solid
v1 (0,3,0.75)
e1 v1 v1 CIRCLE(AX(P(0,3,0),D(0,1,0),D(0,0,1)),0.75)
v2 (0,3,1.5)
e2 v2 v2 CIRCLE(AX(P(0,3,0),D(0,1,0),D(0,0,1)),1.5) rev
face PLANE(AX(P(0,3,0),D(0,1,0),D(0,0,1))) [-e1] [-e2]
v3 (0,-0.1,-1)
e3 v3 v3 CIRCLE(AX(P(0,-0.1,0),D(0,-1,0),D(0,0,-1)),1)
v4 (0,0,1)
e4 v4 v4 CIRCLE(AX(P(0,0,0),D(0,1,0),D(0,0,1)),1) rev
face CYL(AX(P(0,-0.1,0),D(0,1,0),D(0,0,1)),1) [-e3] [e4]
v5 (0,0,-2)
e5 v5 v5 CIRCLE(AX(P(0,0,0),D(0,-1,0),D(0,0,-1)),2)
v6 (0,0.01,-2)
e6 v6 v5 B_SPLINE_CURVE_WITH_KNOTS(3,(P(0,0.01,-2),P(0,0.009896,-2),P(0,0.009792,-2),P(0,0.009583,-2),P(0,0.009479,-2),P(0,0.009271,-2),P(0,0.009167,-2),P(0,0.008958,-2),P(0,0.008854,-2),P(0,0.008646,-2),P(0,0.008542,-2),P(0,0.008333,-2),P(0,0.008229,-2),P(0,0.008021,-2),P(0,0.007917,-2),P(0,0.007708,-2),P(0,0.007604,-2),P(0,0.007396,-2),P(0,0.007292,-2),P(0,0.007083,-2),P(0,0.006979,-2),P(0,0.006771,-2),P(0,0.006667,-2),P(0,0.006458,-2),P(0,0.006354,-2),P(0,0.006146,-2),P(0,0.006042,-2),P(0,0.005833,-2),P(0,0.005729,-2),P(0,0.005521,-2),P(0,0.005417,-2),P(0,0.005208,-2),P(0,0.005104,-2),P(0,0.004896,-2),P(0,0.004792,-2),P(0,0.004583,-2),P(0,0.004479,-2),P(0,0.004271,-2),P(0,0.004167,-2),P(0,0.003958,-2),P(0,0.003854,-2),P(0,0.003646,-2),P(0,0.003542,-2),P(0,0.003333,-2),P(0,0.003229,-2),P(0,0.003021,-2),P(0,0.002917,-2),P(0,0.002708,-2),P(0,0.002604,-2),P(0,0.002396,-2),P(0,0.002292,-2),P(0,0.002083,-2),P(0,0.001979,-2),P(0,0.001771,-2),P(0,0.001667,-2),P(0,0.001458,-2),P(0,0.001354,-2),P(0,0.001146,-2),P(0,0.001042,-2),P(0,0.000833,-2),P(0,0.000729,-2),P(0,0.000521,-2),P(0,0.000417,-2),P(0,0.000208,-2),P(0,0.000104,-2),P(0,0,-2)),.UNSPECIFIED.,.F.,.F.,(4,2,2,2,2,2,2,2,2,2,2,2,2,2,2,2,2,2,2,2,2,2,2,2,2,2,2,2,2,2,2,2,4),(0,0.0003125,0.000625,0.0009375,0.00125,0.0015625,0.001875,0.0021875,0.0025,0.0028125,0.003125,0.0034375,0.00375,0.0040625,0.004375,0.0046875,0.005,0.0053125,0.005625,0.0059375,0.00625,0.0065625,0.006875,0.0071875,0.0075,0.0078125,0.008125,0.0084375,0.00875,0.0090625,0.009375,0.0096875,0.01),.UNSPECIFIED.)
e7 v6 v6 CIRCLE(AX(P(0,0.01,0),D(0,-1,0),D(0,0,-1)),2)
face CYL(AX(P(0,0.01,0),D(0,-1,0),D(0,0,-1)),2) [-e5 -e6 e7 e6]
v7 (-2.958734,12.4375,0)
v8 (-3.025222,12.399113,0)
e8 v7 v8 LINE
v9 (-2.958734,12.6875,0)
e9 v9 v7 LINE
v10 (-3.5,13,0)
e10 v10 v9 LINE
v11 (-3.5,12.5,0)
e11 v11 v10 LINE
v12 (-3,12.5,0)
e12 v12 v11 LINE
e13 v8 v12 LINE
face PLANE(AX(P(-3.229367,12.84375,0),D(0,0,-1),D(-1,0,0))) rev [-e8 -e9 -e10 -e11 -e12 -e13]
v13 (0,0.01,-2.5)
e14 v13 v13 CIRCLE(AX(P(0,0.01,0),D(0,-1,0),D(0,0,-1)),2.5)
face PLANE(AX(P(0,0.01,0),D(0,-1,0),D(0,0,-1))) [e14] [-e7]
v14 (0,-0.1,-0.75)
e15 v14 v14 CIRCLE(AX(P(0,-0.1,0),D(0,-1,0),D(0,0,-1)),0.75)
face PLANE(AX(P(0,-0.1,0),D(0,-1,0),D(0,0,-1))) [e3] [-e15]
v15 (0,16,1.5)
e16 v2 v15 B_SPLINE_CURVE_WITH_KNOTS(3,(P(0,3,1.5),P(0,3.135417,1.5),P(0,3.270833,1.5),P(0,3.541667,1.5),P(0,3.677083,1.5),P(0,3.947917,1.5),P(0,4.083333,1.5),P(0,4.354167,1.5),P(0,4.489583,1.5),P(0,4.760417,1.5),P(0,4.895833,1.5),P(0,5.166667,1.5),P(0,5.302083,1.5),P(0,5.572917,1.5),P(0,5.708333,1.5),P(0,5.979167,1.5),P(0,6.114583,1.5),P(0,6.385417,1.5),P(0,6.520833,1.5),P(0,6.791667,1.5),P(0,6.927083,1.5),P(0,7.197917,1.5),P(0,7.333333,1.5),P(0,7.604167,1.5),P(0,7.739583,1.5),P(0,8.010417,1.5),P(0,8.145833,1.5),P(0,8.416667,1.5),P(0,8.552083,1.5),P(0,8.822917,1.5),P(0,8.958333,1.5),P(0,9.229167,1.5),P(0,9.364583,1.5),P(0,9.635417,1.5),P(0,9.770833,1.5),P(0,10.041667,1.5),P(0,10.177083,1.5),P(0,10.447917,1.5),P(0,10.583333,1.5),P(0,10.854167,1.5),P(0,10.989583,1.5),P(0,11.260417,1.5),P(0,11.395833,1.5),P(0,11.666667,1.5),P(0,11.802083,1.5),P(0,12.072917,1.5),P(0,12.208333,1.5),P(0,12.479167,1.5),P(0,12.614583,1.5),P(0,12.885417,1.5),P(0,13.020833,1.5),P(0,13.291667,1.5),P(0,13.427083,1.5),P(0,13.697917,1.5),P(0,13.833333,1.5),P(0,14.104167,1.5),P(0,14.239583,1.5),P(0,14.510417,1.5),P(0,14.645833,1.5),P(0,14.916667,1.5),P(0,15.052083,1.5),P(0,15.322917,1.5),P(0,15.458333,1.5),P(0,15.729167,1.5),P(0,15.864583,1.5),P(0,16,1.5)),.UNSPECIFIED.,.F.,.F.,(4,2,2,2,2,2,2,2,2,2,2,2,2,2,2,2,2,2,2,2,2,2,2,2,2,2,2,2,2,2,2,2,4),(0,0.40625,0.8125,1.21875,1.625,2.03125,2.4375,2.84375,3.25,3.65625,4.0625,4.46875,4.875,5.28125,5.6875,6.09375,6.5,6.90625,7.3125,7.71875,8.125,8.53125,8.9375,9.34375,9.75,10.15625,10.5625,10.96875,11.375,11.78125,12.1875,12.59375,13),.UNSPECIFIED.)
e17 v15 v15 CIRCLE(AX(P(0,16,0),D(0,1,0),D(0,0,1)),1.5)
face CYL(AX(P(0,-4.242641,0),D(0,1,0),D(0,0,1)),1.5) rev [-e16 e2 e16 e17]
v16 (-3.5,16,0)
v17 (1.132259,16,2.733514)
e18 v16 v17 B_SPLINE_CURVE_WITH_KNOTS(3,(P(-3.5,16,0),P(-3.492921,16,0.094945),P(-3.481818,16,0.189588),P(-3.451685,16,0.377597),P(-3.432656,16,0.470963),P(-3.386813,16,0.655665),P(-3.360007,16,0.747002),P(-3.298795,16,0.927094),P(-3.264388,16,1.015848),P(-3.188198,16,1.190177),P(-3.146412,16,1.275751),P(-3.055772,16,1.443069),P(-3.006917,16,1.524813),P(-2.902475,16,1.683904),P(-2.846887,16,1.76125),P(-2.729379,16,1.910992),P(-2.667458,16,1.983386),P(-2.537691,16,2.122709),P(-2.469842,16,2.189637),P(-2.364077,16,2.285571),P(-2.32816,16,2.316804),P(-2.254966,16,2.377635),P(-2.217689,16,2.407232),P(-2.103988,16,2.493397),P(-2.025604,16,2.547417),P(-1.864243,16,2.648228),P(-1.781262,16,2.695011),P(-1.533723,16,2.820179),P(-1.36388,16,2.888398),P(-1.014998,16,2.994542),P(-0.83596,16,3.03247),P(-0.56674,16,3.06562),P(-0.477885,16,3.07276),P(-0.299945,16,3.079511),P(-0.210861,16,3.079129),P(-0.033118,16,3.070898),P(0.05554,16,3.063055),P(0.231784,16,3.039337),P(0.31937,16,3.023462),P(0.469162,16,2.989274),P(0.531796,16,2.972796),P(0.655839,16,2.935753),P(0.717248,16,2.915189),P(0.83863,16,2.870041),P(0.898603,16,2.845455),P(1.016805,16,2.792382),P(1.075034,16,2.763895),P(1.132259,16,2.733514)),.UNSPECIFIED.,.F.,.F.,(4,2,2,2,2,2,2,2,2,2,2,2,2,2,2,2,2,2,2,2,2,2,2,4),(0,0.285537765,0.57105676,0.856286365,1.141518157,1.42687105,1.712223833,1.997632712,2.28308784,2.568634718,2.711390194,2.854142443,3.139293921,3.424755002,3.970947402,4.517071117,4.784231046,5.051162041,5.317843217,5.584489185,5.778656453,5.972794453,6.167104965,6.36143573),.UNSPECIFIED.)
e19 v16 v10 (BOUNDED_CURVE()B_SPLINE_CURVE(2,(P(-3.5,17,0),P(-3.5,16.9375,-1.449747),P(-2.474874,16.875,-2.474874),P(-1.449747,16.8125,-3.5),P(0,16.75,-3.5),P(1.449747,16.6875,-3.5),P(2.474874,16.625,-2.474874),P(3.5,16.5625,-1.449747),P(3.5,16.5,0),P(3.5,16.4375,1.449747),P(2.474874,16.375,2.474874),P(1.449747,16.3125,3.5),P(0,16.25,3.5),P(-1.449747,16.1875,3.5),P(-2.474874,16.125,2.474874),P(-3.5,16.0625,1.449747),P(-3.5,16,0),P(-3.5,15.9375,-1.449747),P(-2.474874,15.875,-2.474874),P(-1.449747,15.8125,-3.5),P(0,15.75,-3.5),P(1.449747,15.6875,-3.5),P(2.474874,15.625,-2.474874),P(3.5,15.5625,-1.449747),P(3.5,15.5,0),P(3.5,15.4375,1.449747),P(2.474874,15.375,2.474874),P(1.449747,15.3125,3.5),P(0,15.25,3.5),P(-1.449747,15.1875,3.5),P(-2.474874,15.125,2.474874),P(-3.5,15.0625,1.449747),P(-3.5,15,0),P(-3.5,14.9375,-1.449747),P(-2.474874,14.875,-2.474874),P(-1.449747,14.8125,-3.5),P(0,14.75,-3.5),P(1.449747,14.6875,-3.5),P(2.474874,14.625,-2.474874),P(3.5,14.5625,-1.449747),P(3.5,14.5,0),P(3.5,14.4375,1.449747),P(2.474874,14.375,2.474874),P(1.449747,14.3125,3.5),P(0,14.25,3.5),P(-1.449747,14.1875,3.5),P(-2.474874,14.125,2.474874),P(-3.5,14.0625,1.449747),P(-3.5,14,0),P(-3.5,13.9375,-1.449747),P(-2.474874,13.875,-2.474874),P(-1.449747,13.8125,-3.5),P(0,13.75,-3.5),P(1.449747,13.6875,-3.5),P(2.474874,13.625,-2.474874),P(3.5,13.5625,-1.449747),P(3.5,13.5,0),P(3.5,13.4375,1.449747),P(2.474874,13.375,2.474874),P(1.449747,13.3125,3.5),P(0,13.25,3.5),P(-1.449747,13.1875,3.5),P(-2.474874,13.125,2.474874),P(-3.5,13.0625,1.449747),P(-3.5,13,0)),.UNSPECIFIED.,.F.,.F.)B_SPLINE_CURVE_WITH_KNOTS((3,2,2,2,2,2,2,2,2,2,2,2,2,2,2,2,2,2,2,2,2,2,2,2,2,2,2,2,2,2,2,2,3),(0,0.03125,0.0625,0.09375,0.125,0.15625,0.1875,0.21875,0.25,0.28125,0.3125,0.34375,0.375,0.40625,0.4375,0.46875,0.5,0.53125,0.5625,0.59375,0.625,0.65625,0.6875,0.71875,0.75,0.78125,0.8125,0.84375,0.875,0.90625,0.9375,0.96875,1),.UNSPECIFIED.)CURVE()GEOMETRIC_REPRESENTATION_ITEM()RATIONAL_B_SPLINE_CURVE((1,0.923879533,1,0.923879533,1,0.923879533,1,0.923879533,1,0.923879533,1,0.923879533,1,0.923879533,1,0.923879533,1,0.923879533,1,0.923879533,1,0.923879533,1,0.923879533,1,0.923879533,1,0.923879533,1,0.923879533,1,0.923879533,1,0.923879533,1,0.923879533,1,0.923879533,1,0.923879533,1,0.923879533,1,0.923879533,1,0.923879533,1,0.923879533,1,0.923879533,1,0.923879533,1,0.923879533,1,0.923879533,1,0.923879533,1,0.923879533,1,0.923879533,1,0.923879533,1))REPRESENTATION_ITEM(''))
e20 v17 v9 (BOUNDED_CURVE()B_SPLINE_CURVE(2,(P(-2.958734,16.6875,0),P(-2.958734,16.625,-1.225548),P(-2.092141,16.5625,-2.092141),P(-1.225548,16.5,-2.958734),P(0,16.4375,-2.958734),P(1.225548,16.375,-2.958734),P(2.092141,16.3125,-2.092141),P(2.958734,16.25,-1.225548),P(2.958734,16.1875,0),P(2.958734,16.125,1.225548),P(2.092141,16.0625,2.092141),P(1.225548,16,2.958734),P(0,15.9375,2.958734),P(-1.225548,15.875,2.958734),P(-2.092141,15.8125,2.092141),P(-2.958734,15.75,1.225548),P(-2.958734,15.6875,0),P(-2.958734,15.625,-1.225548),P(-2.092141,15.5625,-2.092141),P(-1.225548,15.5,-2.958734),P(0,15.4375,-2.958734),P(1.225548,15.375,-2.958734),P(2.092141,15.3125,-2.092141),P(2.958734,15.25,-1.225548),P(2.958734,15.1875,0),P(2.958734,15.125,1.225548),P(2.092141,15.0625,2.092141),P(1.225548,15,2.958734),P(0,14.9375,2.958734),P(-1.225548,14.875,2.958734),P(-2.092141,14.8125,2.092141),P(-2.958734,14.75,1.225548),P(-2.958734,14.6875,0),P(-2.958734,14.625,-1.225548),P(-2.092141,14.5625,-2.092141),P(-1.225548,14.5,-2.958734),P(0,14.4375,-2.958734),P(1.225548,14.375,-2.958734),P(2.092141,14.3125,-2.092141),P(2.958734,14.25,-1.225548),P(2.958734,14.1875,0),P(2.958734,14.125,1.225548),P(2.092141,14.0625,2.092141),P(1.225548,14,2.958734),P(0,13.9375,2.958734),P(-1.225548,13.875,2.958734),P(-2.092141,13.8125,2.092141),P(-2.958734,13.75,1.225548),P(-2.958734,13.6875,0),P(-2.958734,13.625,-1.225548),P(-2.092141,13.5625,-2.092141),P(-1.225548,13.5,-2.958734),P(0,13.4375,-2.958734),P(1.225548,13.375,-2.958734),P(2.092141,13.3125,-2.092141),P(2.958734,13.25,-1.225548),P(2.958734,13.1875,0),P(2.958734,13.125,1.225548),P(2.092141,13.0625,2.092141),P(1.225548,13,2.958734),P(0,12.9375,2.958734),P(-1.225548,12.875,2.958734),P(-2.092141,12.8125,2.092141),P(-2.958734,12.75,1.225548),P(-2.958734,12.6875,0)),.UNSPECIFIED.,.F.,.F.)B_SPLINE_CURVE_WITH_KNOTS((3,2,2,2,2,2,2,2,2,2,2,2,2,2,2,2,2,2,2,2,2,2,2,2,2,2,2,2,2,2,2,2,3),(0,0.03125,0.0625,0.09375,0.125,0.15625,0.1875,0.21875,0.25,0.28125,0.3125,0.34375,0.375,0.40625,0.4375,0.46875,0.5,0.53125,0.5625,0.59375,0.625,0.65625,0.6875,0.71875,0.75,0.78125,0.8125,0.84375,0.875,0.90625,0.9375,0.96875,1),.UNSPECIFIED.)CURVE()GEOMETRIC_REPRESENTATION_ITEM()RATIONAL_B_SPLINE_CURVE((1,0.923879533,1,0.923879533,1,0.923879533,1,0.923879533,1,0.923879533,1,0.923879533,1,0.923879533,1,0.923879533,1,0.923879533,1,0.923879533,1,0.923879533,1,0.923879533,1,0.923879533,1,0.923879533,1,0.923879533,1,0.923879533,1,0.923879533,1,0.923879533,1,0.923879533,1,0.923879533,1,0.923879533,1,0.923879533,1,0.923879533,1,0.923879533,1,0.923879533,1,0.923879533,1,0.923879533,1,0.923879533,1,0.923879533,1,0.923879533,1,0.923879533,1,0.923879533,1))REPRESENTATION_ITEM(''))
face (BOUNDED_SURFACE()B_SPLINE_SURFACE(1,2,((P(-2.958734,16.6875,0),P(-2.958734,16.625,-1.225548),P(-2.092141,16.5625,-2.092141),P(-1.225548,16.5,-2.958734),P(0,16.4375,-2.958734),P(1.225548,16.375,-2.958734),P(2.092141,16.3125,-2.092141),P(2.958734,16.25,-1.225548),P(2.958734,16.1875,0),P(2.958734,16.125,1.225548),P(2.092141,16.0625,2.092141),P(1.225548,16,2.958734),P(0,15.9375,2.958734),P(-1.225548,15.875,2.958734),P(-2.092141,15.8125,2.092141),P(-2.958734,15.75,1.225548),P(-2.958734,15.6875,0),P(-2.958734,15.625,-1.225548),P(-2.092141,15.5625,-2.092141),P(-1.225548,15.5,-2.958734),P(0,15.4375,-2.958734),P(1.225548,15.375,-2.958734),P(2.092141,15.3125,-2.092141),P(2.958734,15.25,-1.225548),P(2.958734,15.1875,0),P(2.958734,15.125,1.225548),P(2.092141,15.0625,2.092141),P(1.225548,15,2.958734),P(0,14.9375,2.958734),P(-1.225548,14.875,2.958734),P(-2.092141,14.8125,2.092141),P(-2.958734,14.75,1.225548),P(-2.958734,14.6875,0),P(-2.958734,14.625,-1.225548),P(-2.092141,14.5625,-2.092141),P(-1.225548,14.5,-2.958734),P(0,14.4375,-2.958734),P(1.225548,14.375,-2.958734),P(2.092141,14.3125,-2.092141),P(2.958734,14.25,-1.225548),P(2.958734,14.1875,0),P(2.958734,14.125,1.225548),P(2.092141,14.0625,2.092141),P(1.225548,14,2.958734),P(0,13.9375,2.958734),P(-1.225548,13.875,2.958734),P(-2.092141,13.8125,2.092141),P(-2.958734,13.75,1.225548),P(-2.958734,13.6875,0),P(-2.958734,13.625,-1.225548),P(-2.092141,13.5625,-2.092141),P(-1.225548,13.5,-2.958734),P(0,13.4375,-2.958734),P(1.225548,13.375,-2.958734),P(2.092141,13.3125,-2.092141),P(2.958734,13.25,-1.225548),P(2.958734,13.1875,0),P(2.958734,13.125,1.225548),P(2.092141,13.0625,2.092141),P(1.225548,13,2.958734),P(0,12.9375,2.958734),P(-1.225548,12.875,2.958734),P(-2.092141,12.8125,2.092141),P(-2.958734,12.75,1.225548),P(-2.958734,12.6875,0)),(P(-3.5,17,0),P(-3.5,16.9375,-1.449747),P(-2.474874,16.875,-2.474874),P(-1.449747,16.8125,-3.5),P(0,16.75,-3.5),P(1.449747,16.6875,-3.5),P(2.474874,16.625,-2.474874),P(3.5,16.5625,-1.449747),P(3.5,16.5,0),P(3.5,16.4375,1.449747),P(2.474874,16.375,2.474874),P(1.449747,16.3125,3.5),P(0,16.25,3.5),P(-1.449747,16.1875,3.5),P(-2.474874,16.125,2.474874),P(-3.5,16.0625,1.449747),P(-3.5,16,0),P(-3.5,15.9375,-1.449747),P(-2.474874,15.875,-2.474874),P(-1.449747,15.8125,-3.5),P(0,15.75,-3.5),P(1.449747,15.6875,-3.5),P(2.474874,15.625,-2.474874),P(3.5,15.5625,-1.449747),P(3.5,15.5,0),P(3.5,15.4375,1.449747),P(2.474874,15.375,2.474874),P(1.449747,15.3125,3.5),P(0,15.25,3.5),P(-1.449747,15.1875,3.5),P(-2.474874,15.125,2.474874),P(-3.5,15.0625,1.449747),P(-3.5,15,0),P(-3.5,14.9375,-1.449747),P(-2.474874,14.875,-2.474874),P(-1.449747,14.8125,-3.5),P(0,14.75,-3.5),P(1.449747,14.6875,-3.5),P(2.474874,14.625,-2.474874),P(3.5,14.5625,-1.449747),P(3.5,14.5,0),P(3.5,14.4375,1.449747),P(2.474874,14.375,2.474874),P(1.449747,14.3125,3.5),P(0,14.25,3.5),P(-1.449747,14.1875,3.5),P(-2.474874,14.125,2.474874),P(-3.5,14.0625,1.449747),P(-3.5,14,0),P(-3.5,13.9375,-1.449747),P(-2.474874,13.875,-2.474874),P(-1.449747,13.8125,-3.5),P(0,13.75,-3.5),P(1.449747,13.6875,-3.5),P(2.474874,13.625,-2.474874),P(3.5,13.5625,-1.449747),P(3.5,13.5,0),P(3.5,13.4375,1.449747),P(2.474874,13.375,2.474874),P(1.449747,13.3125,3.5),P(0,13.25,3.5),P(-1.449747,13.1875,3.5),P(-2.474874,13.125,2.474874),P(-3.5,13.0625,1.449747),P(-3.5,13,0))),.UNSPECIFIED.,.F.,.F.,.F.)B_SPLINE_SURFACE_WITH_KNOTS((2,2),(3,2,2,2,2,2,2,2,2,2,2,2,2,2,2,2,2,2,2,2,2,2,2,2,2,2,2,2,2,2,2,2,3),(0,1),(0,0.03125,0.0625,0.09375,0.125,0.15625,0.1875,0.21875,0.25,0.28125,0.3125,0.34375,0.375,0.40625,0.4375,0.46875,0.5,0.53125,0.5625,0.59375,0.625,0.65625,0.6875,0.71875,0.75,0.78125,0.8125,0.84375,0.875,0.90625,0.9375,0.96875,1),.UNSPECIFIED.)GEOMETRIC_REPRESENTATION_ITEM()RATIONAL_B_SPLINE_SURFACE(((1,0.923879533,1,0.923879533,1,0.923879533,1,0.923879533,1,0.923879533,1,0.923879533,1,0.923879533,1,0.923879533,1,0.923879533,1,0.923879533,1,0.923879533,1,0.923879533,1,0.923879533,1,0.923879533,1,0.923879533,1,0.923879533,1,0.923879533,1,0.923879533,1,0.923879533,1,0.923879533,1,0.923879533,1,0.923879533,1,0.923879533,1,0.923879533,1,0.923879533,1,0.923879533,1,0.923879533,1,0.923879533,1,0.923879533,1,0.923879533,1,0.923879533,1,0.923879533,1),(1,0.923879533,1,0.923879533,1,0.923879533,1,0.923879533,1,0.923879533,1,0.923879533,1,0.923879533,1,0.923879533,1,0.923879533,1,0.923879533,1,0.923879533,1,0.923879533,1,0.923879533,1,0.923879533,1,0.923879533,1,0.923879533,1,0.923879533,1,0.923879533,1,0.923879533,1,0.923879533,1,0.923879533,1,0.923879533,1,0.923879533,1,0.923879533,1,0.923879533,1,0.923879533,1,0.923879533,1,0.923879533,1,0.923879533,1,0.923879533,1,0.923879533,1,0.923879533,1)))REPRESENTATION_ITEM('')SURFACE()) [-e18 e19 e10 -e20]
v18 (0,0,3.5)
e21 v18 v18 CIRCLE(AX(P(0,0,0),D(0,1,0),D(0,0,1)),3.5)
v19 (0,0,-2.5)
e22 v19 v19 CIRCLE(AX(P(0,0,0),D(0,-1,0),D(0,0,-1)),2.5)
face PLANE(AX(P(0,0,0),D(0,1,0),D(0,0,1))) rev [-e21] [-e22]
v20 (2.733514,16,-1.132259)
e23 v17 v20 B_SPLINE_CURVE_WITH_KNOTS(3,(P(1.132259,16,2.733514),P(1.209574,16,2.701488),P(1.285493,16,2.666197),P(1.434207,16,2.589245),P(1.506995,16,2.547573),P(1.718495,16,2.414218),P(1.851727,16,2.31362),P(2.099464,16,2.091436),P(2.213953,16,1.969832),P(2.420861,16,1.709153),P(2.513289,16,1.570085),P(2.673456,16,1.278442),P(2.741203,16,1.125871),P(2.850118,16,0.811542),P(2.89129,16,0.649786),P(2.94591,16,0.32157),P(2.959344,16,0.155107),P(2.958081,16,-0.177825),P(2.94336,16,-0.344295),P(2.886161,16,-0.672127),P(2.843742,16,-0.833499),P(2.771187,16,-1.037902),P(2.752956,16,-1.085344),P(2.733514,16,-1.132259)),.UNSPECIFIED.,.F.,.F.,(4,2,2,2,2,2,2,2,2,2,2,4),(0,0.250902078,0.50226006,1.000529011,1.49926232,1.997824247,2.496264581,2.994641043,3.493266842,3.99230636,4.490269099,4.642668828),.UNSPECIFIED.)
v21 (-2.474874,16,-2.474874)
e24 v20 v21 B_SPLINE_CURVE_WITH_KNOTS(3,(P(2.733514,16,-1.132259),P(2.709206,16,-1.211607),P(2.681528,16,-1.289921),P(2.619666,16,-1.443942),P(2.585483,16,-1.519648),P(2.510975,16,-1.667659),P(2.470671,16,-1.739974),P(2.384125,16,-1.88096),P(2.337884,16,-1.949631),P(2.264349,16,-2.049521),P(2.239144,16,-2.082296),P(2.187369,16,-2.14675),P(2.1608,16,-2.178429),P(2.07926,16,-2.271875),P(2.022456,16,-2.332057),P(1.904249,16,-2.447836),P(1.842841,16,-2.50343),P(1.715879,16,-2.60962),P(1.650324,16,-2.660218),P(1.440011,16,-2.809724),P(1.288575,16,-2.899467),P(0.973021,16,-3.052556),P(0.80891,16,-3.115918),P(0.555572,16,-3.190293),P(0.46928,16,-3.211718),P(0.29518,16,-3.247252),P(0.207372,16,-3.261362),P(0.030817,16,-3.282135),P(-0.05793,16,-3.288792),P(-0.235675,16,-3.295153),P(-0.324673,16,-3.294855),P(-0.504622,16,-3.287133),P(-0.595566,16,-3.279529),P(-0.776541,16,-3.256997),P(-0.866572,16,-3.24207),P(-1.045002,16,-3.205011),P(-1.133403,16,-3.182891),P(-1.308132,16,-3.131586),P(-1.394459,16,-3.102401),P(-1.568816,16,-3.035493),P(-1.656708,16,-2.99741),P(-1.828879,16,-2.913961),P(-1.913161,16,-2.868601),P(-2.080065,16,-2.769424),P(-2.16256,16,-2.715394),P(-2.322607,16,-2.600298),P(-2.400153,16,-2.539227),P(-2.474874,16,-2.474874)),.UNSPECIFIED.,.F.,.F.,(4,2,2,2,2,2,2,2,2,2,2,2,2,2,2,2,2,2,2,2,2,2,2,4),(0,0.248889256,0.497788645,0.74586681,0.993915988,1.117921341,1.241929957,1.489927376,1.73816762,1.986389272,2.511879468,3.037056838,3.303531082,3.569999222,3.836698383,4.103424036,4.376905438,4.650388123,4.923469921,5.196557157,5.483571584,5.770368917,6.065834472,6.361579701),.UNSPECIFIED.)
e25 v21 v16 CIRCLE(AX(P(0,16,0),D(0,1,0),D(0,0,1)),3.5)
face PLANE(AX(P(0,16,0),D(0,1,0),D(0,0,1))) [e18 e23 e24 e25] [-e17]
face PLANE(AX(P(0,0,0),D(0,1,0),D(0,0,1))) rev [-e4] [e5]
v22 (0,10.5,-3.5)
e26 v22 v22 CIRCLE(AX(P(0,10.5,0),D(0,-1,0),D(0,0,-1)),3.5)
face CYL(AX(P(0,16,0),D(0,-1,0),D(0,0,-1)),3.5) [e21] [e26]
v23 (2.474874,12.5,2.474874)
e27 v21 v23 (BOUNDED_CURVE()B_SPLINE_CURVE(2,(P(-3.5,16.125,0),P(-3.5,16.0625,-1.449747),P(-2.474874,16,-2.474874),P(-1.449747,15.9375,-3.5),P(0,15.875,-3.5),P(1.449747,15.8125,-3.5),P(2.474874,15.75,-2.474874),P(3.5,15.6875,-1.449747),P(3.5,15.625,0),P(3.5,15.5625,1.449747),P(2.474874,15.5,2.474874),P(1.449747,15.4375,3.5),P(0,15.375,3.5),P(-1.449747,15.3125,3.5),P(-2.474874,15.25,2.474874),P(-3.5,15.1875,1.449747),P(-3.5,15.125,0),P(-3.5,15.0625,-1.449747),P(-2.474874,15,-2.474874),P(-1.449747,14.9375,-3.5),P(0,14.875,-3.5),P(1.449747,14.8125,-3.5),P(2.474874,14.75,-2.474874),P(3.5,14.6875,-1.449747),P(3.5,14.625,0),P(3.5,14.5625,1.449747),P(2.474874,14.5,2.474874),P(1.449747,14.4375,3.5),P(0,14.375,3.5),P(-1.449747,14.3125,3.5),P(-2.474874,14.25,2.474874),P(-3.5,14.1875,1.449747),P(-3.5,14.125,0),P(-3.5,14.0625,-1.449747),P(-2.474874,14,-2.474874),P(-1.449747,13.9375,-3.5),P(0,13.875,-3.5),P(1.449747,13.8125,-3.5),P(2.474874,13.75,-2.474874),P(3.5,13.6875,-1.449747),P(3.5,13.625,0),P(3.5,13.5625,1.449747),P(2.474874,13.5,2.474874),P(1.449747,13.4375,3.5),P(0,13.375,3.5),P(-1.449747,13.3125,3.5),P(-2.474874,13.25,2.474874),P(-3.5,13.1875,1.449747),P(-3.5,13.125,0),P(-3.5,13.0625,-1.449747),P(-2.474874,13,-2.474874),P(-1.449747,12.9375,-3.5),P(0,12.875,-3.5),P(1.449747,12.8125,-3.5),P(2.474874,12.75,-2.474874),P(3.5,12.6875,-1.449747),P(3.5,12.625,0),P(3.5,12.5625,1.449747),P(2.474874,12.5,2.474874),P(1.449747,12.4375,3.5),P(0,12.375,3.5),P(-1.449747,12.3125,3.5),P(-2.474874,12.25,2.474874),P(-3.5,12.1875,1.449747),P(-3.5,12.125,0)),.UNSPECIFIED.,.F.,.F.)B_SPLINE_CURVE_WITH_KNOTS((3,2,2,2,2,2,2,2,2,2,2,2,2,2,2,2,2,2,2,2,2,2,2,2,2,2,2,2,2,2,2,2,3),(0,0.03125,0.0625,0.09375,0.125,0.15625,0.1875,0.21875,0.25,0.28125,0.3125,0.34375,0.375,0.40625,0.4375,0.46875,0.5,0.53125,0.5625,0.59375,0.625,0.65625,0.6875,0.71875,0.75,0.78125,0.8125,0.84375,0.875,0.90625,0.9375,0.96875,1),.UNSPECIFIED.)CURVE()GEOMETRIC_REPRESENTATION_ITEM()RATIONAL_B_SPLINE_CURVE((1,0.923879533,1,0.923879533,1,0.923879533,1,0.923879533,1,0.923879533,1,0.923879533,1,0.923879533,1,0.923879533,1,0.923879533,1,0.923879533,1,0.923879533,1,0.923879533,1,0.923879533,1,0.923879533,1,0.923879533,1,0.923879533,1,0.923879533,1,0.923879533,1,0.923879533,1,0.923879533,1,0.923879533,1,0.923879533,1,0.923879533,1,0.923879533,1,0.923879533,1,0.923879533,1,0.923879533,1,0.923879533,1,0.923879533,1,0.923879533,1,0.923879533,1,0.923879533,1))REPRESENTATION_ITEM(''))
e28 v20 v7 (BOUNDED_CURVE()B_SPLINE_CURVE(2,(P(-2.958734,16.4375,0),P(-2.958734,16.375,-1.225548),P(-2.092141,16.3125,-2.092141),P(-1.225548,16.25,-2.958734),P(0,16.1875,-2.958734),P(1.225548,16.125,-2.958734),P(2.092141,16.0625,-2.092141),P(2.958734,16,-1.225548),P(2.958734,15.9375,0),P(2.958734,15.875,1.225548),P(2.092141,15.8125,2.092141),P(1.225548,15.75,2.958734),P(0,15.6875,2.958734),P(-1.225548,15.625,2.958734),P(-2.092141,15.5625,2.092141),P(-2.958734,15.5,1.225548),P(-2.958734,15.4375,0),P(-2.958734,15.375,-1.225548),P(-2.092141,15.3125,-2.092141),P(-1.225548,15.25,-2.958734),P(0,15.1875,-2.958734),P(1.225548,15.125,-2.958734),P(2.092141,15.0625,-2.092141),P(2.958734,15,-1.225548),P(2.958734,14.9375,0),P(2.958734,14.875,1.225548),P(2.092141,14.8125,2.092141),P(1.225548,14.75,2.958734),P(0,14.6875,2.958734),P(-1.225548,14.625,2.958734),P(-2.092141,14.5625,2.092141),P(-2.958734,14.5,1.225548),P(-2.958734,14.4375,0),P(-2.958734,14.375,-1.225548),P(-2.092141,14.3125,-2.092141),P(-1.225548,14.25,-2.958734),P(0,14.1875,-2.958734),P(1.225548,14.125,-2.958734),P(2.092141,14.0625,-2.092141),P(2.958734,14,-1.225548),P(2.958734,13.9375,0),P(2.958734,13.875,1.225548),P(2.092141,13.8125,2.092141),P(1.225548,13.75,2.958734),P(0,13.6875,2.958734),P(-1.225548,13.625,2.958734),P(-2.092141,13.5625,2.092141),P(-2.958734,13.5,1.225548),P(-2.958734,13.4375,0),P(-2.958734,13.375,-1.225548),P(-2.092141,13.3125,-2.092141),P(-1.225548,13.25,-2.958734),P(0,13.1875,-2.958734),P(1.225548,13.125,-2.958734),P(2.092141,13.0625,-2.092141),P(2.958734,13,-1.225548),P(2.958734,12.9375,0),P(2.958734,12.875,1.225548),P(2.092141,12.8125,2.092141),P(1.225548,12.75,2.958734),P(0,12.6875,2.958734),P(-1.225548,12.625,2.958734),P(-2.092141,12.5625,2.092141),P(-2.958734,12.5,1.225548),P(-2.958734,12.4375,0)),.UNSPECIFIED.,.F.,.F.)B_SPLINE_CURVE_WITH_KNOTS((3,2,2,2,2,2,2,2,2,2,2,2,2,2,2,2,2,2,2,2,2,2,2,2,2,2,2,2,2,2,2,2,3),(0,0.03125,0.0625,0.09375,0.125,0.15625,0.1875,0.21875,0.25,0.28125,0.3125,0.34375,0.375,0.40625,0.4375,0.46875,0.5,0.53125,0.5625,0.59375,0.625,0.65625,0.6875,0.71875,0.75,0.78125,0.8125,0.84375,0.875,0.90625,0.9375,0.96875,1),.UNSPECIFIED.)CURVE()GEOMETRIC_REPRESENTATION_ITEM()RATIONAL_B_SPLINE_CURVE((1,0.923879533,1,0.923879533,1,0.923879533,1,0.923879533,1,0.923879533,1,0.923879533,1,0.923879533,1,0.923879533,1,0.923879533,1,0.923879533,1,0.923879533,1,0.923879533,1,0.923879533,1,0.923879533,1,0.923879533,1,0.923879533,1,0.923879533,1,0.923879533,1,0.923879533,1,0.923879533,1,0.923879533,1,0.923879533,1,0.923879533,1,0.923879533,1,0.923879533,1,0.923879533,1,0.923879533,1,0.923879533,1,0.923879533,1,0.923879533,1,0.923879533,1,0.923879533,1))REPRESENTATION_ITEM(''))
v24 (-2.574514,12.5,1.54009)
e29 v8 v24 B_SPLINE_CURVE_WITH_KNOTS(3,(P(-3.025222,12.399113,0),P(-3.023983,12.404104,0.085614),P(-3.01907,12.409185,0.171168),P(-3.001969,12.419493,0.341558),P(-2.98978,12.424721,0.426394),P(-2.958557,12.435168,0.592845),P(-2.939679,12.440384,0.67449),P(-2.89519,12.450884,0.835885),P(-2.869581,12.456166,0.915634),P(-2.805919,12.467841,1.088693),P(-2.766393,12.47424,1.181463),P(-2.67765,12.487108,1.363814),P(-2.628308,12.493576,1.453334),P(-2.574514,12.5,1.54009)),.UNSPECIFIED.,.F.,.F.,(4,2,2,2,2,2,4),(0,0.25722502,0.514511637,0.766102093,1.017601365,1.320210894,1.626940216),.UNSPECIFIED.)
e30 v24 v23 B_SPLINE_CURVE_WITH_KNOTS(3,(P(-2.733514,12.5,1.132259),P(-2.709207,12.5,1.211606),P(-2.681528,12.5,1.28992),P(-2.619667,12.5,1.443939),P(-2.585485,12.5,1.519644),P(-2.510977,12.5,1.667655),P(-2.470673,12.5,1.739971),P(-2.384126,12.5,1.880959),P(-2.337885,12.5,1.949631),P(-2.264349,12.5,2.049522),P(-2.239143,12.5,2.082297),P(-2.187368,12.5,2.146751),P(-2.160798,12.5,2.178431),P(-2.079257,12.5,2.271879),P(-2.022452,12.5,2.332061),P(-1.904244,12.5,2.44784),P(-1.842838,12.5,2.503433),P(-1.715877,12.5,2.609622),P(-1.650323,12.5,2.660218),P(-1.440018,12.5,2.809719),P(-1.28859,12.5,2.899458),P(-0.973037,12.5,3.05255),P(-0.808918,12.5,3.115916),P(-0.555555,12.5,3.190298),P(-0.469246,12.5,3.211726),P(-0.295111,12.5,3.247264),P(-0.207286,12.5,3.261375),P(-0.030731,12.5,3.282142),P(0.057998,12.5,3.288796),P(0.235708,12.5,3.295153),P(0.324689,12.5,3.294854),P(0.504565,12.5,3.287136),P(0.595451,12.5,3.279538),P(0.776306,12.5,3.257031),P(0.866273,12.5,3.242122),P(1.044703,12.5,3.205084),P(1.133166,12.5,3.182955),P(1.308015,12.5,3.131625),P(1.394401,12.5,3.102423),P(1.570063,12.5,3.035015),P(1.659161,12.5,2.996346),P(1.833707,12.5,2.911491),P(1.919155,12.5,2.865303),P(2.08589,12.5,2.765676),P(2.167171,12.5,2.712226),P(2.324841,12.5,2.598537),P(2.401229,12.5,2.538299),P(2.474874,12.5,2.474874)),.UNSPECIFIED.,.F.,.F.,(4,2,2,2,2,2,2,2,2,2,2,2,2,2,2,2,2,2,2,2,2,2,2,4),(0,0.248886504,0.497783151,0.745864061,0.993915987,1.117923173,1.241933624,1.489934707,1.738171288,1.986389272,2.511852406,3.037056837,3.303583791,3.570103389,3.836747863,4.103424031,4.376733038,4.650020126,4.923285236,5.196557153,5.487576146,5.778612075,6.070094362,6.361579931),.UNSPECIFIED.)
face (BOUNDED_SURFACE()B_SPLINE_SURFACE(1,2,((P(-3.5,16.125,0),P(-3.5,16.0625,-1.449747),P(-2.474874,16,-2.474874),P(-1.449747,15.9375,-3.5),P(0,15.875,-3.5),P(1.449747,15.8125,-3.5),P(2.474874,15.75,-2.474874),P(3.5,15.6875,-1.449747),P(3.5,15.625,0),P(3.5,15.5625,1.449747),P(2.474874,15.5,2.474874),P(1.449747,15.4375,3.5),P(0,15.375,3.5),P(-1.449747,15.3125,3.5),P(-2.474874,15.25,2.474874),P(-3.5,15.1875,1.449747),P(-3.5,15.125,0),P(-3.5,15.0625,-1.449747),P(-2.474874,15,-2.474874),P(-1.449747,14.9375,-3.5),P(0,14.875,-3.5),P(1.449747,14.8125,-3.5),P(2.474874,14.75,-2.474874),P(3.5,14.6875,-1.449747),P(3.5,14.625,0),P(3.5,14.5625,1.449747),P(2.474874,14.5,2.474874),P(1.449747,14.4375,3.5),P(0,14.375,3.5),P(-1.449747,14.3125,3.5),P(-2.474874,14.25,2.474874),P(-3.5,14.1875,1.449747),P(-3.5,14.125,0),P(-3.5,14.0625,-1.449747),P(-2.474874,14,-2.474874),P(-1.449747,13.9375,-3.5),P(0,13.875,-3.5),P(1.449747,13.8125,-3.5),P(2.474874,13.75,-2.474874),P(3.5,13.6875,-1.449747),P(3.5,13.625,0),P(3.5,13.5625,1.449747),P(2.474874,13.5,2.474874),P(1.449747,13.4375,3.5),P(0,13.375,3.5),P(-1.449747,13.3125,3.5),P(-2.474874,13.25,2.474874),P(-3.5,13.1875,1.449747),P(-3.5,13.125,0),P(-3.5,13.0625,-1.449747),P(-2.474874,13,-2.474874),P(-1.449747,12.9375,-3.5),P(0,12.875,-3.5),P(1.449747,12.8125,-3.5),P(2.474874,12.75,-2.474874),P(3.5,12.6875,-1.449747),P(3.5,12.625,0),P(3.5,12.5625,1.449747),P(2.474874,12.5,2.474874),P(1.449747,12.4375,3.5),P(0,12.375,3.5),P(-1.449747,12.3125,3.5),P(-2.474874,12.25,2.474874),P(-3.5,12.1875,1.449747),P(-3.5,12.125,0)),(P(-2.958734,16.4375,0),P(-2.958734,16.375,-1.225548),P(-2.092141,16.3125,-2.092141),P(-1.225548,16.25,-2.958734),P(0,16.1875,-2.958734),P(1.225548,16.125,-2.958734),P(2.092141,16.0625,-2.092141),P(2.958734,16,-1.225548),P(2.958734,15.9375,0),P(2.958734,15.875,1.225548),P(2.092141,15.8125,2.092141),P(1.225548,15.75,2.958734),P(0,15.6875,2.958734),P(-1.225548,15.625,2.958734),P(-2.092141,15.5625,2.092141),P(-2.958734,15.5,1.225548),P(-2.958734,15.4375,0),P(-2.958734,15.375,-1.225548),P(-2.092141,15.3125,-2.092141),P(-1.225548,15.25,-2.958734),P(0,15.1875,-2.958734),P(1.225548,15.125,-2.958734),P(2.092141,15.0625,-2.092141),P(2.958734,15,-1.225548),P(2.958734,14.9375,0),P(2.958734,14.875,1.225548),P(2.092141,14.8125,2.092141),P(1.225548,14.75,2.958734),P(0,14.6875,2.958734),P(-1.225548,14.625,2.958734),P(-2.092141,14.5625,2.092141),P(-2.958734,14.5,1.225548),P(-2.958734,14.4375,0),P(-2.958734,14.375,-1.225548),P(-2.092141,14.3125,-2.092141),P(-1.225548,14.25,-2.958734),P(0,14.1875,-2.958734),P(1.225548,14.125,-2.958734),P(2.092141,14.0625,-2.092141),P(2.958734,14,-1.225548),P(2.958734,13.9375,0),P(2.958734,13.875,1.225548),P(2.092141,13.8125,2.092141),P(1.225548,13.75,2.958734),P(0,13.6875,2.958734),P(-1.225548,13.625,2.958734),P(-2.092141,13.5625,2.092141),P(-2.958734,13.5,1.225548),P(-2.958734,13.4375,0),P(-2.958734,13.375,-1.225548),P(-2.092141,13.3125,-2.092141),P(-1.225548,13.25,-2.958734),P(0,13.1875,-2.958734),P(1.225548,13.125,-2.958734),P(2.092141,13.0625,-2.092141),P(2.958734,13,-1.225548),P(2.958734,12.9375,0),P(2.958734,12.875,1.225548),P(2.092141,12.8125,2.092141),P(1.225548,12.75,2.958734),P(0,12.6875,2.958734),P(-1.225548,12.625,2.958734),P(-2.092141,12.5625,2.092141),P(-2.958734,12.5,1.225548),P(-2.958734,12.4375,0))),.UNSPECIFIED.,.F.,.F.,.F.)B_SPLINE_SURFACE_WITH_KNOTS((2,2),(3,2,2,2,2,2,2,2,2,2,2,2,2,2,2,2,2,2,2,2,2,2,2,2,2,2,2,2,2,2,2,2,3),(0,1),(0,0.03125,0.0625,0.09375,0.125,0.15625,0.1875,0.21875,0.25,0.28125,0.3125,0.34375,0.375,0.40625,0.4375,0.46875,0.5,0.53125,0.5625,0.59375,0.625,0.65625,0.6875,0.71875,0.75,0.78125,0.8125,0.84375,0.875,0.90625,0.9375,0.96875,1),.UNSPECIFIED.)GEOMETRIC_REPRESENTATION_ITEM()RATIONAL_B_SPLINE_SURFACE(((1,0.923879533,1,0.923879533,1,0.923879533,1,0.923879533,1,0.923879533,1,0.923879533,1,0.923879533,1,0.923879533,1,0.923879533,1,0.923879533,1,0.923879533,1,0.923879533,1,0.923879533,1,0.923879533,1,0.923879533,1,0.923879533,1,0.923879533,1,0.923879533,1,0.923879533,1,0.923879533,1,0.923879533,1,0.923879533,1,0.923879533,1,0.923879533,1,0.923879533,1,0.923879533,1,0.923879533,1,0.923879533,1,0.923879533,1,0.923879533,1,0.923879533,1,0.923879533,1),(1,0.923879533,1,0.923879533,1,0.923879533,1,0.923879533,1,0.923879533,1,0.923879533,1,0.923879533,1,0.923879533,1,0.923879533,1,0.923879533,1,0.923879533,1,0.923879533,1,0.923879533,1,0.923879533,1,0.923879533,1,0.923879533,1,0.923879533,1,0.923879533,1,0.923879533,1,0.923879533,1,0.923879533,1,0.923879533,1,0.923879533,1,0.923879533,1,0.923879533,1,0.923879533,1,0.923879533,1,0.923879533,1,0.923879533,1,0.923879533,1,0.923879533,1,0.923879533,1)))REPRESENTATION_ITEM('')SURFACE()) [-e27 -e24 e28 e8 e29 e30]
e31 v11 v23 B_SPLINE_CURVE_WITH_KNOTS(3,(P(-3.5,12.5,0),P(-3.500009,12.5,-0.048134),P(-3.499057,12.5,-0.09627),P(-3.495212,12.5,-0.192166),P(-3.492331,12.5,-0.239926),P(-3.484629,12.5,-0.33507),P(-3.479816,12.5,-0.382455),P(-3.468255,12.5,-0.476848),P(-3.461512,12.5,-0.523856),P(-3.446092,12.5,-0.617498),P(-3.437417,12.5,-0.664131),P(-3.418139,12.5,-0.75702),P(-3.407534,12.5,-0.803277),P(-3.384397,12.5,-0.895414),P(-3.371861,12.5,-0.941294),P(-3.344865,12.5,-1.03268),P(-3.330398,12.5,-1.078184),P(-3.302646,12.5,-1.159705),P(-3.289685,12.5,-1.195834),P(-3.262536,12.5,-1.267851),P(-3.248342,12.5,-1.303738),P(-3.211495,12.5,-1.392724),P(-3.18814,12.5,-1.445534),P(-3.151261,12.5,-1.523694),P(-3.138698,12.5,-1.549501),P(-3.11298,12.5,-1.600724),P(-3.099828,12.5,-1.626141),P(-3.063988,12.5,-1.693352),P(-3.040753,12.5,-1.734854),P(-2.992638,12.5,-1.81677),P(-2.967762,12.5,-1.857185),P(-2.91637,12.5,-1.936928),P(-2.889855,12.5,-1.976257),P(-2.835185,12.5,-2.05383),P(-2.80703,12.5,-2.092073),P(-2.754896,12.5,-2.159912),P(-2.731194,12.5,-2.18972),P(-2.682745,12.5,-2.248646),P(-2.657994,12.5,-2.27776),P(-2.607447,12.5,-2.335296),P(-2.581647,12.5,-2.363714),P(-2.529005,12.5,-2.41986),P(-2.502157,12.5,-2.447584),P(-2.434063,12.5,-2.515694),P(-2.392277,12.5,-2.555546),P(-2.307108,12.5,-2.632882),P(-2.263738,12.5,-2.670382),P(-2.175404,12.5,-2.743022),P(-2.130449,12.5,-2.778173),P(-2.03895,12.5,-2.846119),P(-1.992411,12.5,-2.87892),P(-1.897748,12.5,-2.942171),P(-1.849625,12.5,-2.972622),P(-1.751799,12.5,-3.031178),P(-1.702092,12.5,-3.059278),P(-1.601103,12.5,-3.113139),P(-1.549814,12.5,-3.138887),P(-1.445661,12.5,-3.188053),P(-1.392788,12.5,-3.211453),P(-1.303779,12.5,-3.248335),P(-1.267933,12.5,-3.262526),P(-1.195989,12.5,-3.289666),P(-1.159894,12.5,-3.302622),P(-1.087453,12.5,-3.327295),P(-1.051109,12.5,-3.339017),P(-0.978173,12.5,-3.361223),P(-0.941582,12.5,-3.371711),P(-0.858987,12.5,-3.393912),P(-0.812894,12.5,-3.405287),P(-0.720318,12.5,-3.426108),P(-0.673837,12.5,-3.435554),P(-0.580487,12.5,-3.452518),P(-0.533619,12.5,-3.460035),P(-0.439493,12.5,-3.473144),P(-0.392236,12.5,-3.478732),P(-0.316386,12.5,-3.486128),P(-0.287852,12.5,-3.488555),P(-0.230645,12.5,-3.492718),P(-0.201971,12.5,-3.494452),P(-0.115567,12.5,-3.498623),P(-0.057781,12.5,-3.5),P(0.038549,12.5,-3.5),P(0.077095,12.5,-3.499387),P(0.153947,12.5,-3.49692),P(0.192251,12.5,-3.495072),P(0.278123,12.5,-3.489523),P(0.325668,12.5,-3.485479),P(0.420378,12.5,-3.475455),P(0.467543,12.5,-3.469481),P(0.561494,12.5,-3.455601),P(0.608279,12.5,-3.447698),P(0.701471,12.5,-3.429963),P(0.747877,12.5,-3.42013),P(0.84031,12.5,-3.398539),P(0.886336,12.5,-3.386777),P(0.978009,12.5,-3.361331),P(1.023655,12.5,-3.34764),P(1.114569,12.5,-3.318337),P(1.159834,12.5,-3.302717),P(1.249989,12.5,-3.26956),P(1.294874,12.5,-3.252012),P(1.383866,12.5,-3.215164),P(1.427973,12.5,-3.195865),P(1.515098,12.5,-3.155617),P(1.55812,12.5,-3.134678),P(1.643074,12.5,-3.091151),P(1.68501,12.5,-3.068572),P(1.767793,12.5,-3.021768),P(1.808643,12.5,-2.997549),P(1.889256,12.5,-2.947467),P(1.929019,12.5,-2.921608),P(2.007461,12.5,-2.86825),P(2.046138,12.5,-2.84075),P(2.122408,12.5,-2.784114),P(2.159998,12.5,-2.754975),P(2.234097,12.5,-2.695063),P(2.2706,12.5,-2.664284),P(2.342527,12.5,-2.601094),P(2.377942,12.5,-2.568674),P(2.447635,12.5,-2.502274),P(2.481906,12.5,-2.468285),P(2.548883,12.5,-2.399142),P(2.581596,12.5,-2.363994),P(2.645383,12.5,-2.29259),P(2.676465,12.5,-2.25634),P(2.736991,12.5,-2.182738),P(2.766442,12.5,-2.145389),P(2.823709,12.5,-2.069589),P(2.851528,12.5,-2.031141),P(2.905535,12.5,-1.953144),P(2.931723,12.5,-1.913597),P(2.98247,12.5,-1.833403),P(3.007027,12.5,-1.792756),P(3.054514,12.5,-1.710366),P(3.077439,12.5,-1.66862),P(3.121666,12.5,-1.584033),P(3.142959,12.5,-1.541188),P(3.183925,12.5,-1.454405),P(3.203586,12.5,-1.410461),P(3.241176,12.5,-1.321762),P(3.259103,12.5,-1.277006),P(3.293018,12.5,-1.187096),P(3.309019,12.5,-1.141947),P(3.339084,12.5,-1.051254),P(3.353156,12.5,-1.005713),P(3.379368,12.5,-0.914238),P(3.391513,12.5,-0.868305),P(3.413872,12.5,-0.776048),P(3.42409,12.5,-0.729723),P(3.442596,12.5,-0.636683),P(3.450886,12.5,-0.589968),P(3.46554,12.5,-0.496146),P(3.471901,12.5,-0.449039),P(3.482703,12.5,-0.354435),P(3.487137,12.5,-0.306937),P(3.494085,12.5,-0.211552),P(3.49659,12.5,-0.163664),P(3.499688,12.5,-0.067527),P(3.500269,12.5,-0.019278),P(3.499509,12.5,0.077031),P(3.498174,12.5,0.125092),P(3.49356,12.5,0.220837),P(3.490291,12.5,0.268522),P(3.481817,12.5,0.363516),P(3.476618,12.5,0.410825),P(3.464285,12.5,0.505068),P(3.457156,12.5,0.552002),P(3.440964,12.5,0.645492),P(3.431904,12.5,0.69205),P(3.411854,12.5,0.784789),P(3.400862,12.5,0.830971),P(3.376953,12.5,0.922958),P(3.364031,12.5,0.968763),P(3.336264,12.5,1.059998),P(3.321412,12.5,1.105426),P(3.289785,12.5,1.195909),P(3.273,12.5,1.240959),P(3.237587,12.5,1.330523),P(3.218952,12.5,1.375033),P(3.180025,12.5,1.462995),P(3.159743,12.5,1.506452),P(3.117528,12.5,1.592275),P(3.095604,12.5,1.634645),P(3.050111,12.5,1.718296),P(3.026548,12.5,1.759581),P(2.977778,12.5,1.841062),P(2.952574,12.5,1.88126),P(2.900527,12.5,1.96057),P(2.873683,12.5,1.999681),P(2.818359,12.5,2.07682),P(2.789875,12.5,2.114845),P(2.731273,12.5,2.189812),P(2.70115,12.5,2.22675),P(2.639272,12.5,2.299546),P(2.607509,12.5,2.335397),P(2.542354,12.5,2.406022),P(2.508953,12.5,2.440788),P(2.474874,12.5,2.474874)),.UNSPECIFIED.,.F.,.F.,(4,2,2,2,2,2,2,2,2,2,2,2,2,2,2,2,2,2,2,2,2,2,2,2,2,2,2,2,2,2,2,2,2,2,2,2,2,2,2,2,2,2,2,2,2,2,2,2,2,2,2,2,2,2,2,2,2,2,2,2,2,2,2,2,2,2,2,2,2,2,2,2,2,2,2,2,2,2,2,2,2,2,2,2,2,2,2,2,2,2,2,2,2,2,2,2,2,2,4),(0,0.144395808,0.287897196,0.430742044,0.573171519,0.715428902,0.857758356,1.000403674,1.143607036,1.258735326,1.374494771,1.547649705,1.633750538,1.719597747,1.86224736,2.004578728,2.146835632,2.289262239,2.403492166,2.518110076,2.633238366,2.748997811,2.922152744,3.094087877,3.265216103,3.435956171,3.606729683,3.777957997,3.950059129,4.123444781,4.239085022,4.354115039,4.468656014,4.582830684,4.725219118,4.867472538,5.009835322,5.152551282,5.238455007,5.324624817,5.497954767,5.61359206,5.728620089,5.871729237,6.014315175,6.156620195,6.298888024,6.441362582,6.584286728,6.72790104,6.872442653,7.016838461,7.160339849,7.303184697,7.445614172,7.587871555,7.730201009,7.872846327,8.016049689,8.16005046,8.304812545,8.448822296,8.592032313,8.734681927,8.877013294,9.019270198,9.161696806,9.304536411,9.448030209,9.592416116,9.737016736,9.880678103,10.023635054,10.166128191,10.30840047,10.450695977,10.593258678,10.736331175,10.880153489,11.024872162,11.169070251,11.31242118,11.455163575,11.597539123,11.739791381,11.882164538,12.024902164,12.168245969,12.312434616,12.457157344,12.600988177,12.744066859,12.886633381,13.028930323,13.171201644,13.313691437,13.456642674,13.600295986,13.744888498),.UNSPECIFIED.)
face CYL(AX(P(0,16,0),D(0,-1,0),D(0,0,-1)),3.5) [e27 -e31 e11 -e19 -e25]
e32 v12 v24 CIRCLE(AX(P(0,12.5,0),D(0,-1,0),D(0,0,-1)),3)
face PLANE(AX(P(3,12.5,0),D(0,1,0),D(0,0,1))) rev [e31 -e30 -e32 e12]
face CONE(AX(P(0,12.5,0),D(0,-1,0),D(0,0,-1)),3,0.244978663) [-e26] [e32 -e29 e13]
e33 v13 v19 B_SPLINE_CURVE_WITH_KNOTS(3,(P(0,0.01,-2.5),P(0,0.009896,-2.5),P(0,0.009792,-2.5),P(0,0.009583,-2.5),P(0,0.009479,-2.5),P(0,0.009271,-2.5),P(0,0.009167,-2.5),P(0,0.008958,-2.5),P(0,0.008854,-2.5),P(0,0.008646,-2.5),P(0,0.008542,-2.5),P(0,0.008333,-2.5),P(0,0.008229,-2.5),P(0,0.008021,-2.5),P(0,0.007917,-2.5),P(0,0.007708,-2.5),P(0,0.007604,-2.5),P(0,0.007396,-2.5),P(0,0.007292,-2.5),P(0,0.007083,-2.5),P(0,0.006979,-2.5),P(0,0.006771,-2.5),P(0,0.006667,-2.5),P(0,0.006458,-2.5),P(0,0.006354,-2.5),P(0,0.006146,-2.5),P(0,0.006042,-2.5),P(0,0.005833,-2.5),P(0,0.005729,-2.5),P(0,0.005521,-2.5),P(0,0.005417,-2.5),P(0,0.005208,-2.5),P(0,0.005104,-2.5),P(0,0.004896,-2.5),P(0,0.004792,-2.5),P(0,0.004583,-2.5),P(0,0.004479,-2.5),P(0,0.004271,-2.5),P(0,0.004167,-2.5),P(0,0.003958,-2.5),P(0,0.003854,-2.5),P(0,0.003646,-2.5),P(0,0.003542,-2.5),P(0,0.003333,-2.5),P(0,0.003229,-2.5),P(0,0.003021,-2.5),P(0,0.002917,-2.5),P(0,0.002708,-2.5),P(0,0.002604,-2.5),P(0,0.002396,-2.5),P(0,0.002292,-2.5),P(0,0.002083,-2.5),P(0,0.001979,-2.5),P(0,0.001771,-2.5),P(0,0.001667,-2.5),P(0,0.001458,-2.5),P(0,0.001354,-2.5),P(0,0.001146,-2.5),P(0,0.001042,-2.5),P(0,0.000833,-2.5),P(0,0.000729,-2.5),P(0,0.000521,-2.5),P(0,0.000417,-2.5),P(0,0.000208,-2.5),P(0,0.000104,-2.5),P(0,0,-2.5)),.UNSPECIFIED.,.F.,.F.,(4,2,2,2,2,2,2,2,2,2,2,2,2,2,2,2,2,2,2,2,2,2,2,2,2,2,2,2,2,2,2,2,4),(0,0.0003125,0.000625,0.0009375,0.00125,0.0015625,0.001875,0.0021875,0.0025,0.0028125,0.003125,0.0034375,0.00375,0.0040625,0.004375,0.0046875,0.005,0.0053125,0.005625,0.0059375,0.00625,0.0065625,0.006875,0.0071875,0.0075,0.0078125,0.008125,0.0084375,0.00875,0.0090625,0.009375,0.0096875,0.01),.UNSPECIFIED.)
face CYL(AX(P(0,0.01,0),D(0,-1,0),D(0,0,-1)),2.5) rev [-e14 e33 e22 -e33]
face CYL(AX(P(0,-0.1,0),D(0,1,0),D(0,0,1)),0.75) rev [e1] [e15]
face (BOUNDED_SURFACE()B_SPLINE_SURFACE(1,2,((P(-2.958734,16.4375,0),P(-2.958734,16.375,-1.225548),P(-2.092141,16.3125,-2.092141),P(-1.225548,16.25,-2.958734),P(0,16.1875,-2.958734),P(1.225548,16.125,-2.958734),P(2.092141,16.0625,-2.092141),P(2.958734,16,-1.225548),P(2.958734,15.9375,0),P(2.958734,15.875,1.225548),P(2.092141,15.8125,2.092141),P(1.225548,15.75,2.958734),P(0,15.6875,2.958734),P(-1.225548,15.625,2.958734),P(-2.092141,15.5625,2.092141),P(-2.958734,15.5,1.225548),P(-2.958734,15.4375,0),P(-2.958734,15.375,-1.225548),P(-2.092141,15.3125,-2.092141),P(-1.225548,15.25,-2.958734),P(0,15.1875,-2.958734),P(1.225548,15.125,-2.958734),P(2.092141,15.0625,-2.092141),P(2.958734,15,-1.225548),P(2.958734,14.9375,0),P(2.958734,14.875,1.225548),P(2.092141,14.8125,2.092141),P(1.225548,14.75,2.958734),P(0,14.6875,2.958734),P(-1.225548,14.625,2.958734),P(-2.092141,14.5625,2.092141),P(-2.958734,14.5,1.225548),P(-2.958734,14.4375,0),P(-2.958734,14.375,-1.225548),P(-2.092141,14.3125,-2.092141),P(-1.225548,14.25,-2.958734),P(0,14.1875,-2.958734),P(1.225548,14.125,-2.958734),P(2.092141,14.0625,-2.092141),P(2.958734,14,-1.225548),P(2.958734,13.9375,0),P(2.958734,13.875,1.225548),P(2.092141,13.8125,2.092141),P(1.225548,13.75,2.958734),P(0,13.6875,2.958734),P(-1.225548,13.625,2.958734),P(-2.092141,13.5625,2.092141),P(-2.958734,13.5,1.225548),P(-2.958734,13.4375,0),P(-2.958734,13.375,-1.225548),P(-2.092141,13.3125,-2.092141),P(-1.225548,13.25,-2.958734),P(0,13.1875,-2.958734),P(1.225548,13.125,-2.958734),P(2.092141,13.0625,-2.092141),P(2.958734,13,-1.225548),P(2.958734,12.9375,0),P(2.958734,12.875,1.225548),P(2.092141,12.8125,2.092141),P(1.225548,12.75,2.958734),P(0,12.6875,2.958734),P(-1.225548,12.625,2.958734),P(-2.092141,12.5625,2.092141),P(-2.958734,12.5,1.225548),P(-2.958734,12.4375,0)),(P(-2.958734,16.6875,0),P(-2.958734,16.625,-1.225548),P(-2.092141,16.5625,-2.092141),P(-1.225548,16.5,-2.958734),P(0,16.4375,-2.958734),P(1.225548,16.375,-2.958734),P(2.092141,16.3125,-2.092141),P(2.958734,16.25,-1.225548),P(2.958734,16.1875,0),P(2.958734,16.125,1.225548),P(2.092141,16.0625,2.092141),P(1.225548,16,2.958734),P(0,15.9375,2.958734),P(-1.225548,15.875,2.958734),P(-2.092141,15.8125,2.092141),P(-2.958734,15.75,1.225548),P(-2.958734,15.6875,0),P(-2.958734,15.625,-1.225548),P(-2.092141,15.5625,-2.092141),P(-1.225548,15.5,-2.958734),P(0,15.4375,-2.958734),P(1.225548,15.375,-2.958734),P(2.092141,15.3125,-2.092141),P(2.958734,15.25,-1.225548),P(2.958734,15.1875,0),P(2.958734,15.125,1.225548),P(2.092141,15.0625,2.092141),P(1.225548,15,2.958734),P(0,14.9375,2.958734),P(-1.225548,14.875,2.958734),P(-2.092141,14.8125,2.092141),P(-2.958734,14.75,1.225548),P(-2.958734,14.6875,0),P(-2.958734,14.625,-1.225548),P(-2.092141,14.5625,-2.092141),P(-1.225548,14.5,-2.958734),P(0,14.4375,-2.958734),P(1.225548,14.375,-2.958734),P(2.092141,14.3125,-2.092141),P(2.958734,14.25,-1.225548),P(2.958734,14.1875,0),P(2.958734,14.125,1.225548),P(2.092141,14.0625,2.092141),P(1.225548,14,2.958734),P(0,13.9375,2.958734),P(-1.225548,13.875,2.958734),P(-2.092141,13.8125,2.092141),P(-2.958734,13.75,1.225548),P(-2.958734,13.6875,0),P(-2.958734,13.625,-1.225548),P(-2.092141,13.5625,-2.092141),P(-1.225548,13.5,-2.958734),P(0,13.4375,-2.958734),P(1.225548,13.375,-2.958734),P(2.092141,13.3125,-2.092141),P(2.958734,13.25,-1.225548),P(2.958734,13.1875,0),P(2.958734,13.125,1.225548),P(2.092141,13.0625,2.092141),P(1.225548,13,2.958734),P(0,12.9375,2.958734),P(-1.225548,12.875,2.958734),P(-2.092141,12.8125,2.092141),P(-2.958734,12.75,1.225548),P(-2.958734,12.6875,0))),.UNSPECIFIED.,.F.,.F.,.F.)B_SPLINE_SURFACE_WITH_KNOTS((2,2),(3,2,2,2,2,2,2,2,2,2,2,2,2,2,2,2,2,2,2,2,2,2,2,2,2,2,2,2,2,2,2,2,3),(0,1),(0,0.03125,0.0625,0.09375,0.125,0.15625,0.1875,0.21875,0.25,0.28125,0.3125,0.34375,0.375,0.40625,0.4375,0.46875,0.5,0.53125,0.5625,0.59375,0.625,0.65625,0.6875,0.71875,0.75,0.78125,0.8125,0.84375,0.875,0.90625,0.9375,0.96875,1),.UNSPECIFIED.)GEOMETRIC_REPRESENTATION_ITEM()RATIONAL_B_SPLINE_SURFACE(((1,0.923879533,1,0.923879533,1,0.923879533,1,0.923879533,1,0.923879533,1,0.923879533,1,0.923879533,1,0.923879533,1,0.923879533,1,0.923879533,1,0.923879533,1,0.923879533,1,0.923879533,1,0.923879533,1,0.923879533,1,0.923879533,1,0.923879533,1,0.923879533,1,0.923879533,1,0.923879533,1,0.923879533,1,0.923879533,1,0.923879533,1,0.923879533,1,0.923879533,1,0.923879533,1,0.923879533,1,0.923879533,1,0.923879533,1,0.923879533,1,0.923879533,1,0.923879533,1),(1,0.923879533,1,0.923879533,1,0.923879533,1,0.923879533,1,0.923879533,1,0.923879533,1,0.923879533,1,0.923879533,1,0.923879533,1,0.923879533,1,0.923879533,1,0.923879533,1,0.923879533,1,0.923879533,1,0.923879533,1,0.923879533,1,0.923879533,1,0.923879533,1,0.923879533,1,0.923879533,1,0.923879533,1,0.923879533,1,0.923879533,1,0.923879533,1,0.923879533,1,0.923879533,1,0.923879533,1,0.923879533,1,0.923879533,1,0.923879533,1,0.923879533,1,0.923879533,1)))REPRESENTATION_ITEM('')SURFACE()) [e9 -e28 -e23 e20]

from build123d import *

# Parameters (mm, degrees)
MAINBODYS_R              = 3.5
MAIN_BODY_DEPTH          = 16
CONTACTETCHS_R           = 2.5
CONTACTETCHS_R_2         = 2
CONTACT_ETCH_DEPTH       = 0.01
ARMATURECONTACTS_R       = 1
ARMATURECONTACTS_R_2     = 0.75
ARMATURE_CONTACT_DEPTH   = 0.1
ARMATURETHRUHOLES_R      = 0.75
ARMATURE_THRU_HOLE_DEPTH = 17.748134224
BORES_R                  = 1.5
BORE_DEPTH               = 13
M7_X_5_PITCH             = 1


with BuildPart() as part:
    # MainBodyS → MAIN BODY (new body)
    with BuildSketch(Plane(origin=(0, 0, 0), x_dir=(1, 0, 0), z_dir=(0, 1, 0))):
        with Locations(Location((0, 0, 0), (0, 0, 270))):
            Circle(MAINBODYS_R)
    extrude(amount=MAIN_BODY_DEPTH)

    # ContactEtchS → CONTACT ETCH (cut)
    with BuildSketch(Plane.XZ):
        with Locations(Location((0, 0, 0), (0, 0, 270))):
            Circle(CONTACTETCHS_R)
        with Locations(Location((0, 0, 0), (0, 0, 270))):
            Circle(CONTACTETCHS_R_2, mode=Mode.SUBTRACT)
    extrude(amount=-CONTACT_ETCH_DEPTH, mode=Mode.SUBTRACT)

    # ArmatureContactS → ARMATURE CONTACT (add)
    with BuildSketch(Plane(origin=(0, 0, 0), x_dir=(-1, 0, 0), z_dir=(0, -1, 0))):
        with Locations(Location((0, 0, 0), (0, 0, 270))):
            Circle(ARMATURECONTACTS_R)
        with Locations(Location((0, 0, 0), (0, 0, 90))):
            Circle(ARMATURECONTACTS_R_2, mode=Mode.SUBTRACT)
    extrude(amount=ARMATURE_CONTACT_DEPTH)

    # ArmatureThruHoleS → ARMATURE THRU HOLE (cut, through all)
    with BuildSketch(Plane.XZ):
        with Locations(Location((0, 0, 0), (0, 0, 270))):
            Circle(ARMATURETHRUHOLES_R)
    extrude(amount=-ARMATURE_THRU_HOLE_DEPTH, mode=Mode.SUBTRACT)

    # ThreadCutS → THREAD CUT (revolve, cut)
    with BuildSketch(Plane.XY, mode=Mode.PRIVATE) as thread_cut_sk:
        Polygon((3, 12.5), (3.5, 10.5), (3.5, 12.5), align=None)
    revolve(thread_cut_sk.sketch.rotate(Axis((0, 0, 0), (0, 1, 0)), 90), axis=Axis((0, 0, 0), (0, 1, 0)), mode=Mode.SUBTRACT)

    # BoreS → BORE (cut)
    with BuildSketch(Plane(origin=(0, 16, 0), x_dir=(1, 0, 0), z_dir=(0, 1, 0))):
        with Locations(Location((0, 0, 0), (0, 0, 270))):
            Circle(BORES_R)
    extrude(amount=-BORE_DEPTH, mode=Mode.SUBTRACT)

    # M7 x .5: arcs per turn and ends read off the stored shape
    # M7 x .5: the profile of Thread Profile3 profile screwed along a right-hand helix through 4 turns, 8 arcs to a turn; built about Z, then put on its axis
    m7_x_5_z = Axis((0, 0, 0), (0, 0, 1))
    m7_x_5_corners = [(3.5003, 0, -0.000173205), (3.5003, 0, 0.875173202), (2.958734125, 0, 0.562499999), (2.958734125, 0, 0.312499999)]
    with BuildLine(mode=Mode.PRIVATE) as m7_x_5_profile:
        Line(m7_x_5_corners[0], m7_x_5_corners[1])
        Line(m7_x_5_corners[1], m7_x_5_corners[2])
        Line(m7_x_5_corners[2], m7_x_5_corners[3])
        Line(m7_x_5_corners[3], m7_x_5_corners[0])
    m7_x_5_cap = Face(m7_x_5_profile.wire())
    m7_x_5_turn_angles = [0, 22.5, 45, 67.5, 90, 112.5, 135, 157.5, 180, 202.5, 225, 247.5, 270, 292.5, 315, 337.5, 360]
    m7_x_5_turn_weights = [1, 0.9238795325112867, 1, 0.9238795325112867, 1, 0.9238795325112867, 1, 0.9238795325112867, 1, 0.9238795325112867, 1, 0.9238795325112867, 1, 0.9238795325112867, 1, 0.9238795325112867, 1]
    m7_x_5_turn_rails = [Edge.make_bspline([Vector(p[0], p[1], 0).rotate(m7_x_5_z, m7_x_5_turn_angles[k]) / m7_x_5_turn_weights[k] + Vector(0, 0, p[2] + M7_X_5_PITCH * m7_x_5_turn_angles[k] / 360) for k in range(17)], [0, 0, 0, 1, 1, 2, 2, 3, 3, 4, 4, 5, 5, 6, 6, 7, 7, 8, 8, 8], 2, m7_x_5_turn_weights) for p in m7_x_5_corners]
    m7_x_5_turn_sides = [Face.make_surface_from_curves(m7_x_5_turn_rails[p[0]], m7_x_5_turn_rails[p[1]]) for p in [(0, 1), (1, 2), (2, 3), (3, 0)]]
    m7_x_5 = Plane(origin=(0, 17, 0), x_dir=(-1, 0, 0), z_dir=(0, -1, 0)) * Solid(Shell([*[p.moved(Location((0, 0, M7_X_5_PITCH * i))) for i in range(4) for p in m7_x_5_turn_sides], m7_x_5_cap, m7_x_5_cap.rotate(m7_x_5_z, 1440).moved(Location((0, 0, M7_X_5_PITCH * 1440 / 360)))]))
    add(m7_x_5, mode=Mode.SUBTRACT)


solid = part.part
